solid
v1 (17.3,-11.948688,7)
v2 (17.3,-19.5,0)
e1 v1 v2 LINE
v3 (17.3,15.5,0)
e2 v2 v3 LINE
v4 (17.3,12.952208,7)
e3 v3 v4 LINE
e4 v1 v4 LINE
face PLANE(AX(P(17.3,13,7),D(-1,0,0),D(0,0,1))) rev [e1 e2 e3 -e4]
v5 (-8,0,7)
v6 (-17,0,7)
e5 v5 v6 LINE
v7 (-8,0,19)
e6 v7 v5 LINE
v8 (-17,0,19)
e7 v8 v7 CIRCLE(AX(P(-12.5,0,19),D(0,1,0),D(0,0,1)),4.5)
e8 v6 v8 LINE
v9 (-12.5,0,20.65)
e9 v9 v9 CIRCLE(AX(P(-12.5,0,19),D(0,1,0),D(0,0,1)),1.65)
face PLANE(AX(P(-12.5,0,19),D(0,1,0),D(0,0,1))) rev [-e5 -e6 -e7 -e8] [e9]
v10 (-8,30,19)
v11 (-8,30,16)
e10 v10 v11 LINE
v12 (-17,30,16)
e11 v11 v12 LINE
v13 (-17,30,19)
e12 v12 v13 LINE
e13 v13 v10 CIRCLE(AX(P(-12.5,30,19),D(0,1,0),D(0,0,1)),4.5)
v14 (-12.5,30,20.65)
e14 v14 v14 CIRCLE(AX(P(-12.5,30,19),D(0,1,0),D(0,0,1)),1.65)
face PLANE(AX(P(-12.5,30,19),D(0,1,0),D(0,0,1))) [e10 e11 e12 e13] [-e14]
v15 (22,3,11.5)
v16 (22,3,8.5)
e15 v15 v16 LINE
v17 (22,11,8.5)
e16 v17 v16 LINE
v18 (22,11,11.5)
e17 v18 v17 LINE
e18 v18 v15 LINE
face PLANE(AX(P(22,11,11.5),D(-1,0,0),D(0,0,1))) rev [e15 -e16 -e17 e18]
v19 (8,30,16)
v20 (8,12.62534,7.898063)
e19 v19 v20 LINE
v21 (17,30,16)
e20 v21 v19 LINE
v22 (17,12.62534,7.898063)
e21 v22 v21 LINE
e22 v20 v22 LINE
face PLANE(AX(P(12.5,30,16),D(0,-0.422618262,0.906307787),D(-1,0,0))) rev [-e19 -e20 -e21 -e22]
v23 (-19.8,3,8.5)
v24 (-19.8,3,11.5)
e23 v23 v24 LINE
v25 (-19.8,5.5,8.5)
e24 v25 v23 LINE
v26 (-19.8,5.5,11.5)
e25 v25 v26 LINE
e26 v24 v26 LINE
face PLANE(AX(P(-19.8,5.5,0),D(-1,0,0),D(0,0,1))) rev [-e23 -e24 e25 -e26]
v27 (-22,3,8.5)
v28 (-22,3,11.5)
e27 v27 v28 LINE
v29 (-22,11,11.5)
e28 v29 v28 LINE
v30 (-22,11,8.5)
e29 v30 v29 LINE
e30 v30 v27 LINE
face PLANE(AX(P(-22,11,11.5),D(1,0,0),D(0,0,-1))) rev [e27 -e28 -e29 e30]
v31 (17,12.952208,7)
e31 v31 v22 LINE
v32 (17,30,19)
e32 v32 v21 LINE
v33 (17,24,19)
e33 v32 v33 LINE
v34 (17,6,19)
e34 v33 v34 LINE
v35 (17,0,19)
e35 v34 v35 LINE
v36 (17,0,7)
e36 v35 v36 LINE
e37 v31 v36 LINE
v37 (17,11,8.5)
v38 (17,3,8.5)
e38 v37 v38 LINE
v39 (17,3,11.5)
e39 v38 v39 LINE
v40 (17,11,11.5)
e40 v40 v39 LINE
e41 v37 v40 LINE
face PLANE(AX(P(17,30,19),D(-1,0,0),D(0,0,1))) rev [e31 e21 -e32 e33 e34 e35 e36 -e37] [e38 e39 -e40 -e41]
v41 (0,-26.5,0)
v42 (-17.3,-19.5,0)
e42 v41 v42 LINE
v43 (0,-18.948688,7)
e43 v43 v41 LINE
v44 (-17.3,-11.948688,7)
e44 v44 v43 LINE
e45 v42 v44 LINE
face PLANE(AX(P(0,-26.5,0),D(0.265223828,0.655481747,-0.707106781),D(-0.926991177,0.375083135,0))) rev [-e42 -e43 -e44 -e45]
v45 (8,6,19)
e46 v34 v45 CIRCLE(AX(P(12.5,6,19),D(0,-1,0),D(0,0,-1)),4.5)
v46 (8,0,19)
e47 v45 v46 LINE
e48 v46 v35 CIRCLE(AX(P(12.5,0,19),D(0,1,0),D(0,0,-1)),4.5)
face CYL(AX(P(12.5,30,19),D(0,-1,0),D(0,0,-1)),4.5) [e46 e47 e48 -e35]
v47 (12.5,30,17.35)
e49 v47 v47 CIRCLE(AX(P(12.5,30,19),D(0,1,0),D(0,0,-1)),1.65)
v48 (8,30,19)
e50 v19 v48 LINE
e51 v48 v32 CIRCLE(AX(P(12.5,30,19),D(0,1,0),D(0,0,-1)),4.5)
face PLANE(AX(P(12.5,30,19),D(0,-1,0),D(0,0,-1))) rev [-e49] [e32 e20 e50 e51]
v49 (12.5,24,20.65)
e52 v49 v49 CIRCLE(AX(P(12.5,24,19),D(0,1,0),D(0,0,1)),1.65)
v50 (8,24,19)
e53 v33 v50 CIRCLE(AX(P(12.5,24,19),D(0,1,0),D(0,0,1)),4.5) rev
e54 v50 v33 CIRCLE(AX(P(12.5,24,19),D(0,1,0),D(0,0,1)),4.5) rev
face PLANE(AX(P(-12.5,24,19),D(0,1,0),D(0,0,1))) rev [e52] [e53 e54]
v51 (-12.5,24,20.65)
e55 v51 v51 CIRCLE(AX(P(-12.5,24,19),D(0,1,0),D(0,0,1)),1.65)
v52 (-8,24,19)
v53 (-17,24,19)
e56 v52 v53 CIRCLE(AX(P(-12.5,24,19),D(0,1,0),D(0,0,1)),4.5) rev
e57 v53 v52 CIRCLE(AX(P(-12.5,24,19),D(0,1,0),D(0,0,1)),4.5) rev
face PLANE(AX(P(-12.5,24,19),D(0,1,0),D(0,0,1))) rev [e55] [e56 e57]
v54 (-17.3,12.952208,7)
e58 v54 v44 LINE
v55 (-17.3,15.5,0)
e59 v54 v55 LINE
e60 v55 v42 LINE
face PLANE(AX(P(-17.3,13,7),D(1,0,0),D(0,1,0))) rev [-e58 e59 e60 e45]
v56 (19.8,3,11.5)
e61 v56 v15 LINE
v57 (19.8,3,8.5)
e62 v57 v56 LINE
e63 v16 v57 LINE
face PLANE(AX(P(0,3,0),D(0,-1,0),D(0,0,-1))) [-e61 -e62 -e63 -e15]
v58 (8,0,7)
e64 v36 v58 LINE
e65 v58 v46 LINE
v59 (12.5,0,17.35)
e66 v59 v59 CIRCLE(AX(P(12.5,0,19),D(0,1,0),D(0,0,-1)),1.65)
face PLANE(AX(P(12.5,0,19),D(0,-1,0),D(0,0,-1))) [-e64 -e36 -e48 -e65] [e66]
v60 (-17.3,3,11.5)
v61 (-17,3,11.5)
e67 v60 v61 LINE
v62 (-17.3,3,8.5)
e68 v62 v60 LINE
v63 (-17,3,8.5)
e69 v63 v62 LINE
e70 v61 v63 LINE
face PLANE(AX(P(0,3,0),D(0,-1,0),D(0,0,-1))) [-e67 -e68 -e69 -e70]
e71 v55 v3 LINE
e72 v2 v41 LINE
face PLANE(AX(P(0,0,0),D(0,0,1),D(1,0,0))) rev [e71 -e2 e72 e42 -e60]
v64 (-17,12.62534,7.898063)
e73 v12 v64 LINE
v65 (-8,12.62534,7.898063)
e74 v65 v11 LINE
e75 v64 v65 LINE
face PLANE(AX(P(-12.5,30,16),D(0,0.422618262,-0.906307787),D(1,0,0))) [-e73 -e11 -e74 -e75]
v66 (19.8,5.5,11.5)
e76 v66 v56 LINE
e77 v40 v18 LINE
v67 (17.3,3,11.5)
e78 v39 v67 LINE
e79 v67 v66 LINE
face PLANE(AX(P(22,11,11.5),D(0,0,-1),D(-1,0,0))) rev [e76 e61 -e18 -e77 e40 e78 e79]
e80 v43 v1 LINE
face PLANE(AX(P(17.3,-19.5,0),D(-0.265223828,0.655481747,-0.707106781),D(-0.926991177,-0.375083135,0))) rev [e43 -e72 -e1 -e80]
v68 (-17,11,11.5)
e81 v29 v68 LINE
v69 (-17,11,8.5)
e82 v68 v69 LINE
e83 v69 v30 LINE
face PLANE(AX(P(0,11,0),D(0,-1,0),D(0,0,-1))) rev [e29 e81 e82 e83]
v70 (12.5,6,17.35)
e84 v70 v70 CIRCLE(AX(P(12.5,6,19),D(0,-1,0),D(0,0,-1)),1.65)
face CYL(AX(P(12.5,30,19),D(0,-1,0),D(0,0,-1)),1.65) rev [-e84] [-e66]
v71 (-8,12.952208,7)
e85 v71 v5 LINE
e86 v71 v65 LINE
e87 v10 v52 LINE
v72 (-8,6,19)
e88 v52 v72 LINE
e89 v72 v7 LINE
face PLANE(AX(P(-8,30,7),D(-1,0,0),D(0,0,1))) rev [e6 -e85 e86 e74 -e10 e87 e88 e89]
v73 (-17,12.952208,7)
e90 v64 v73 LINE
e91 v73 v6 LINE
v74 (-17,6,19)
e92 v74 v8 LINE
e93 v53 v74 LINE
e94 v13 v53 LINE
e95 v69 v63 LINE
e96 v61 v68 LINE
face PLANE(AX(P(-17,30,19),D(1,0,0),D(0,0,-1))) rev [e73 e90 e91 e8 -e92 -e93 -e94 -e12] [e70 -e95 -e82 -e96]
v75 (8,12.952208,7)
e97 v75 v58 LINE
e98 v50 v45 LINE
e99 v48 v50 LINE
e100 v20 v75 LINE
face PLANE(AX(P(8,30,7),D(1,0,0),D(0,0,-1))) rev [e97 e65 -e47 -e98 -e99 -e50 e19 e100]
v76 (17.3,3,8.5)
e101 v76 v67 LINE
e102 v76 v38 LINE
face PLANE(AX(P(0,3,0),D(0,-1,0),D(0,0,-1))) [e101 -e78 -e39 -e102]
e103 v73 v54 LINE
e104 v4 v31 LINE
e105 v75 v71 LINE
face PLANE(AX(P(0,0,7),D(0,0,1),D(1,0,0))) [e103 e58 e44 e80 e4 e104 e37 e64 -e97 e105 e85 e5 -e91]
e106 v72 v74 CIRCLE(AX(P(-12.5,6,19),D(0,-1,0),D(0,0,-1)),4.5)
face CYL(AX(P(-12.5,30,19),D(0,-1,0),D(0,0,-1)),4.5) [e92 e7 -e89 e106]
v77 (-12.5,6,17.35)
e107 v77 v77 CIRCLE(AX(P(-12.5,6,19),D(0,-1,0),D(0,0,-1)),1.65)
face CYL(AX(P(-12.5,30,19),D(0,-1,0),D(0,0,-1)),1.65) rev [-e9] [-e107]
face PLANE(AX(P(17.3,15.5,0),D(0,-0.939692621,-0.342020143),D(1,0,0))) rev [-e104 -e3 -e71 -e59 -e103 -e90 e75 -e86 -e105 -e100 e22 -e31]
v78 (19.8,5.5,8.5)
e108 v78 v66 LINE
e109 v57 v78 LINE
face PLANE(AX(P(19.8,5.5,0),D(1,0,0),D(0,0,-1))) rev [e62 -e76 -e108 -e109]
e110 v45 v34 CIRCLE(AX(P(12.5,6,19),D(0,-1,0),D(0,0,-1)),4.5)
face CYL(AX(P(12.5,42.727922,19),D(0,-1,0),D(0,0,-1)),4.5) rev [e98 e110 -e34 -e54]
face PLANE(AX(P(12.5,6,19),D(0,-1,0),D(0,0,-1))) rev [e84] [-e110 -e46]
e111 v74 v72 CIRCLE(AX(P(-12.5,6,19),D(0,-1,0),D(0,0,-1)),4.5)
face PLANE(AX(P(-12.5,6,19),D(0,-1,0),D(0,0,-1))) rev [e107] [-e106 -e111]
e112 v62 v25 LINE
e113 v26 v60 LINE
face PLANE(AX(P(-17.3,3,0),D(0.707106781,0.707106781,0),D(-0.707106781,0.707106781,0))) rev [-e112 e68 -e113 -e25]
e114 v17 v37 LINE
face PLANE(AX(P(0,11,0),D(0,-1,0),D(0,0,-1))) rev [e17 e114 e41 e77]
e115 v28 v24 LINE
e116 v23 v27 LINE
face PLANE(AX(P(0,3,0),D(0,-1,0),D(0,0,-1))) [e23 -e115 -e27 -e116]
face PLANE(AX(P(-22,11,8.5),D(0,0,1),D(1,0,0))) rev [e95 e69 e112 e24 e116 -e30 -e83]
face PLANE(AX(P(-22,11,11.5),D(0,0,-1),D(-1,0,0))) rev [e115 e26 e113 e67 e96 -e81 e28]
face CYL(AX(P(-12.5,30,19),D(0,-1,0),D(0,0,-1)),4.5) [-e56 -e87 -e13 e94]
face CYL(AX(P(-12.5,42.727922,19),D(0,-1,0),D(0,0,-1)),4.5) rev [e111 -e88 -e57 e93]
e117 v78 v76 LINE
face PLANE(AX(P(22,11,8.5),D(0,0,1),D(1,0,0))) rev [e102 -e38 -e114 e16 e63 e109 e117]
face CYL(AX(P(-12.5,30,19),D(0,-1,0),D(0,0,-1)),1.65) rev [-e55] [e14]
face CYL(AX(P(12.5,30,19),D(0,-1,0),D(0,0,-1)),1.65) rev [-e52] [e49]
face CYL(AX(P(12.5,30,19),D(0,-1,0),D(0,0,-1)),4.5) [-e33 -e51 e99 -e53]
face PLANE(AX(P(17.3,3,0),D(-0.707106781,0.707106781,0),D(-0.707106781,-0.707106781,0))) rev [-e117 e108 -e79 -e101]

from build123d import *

# Parameters (mm, degrees)
ESBO_O1_W                  = 34.6
ESBO_O1_H                  = 26
RESSALTO_EXTRUS_O1_DEPTH   = 7
ESBO_O10_W                 = 34.6
ESBO_O10_H                 = 2.5
RESSALTO_EXTRUS_O4_DEPTH   = 7
CHANFRO1_SIZE              = 7
CHANFRO2_SIZE2             = 7
CHANFRO2_SIZE              = 2.54779164
ESBO_O12_R                 = 1.65
RESSALTO_EXTRUS_O5_DEPTH   = 30
RESSALTO_EXTRUS_O6_START   = 3
RESSALTO_EXTRUS_O6_DEPTH   = 8
CORTE_EXTRUS_O2_DEPTH      = 40.089640571
CORTE_EXTRUS_O2_DEPTH_BACK = 40.089640571
CHANFRO3_SIZE              = 9
CHANFRO3_SIZE_2            = 19.300562285
CORTE_EXTRUS_O3_START      = -24
ESBO_O17_R                 = 4.5
CORTE_EXTRUS_O3_DEPTH      = 18


# Some blends are built 0.0001 mm under size
with BuildPart() as part:
    # Esboço1 → Ressalto-extrusão1 (new body)
    with BuildSketch(Plane.XY):
        Rectangle(ESBO_O1_W, ESBO_O1_H)
    extrude(amount=RESSALTO_EXTRUS_O1_DEPTH)

    # Esboço10 → Ressalto-extrusão4 (add)
    with BuildSketch(Plane(origin=(0, 0, 0), x_dir=(-1, 0, 0), z_dir=(0, 0, -1))):
        Polygon((-17.3, -19.5), (0, -26.5), (17.3, -19.5), (17.3, -13), (-17.3, -13), align=None)
        with Locations((0, 14.25)):
            Rectangle(ESBO_O10_W, ESBO_O10_H)
    extrude(amount=-RESSALTO_EXTRUS_O4_DEPTH)

    # Chanfro1
    chanfro1_edges = [part.edges().sort_by_distance(p)[0] for p in [
        (8.65, -23, 7),
        (-8.65, -23, 7),
    ]]
    chamfer(chanfro1_edges, length=CHANFRO1_SIZE - 0.0001)  # a hair under: the kernel refuses the full size

    # Chanfro2
    chanfro2_edges = [part.edges().sort_by_distance(p)[0] for p in [
        (0, 15.5, 7),
    ]]
    chanfro2_side = [part.faces().sort_by_distance(p)[0] for p in [
        (0, 15.449044167, 7),
    ]]
    chamfer(chanfro2_edges, length=CHANFRO2_SIZE - 0.0001, length2=CHANFRO2_SIZE2 - 0.0001, reference=chanfro2_side[0])  # a hair under: the kernel refuses the full size

    # Esboço12 → Ressalto-extrusão5 (add)
    # profile 1 of 2: a face of its own
    with BuildSketch(Plane(origin=(0, 0, 0), x_dir=(1, 0, 0), z_dir=(0, 1, 0))):
        with BuildLine():
            Line((-17, -19), (-17, -7))
            Line((-17, -7), (-8, -7))
            Line((-8, -7), (-8, -19))
            ThreePointArc((-8, -19), (-12.5, -23.5), (-17, -19))
        make_face()
        with Locations(Location((-12.5, -19, 0), (0, 0, 270))):
            Circle(ESBO_O12_R, mode=Mode.SUBTRACT)
    # profile 2 of 2: a face of its own
    with BuildSketch(Plane(origin=(0, 0, 0), x_dir=(1, 0, 0), z_dir=(0, 1, 0))):
        with BuildLine():
            Line((8, -7), (8, -19))
            ThreePointArc((8, -19), (12.5, -23.5), (17, -19))
            Line((17, -19), (17, -7))
            Line((17, -7), (8, -7))
        make_face()
        with Locations(Location((12.5, -19, 0), (0, 0, 90))):
            Circle(ESBO_O12_R, mode=Mode.SUBTRACT)
    extrude(amount=RESSALTO_EXTRUS_O5_DEPTH)

    # Esboço15 → Ressalto-extrusão6 (add)
    with BuildSketch(Plane(origin=(0, 0, 0), x_dir=(1, 0, 0), z_dir=(0, 1, 0)).offset(RESSALTO_EXTRUS_O6_START)):
        Polygon((-22, -11.5), (-22, -8.5), (-17, -8.5), (-17, -7), (-8, -7), (-8, -11.5), align=None)
        Polygon((17, -8.5), (17, -7), (8, -7), (8, -11.5), (22, -11.5), (22, -8.5), align=None)
    extrude(amount=RESSALTO_EXTRUS_O6_DEPTH)

    # Esboço16 → Corte-extrusão2 (cut, two sides: drawn at the far end of the back side and taken through both)
    with BuildSketch(Plane.XY.offset(11.5).offset(-CORTE_EXTRUS_O2_DEPTH_BACK)):
        Polygon((-17.3, 3), (-19.8, 5.5), (-19.8, 3), align=None)
        Polygon((19.8, 3), (17.3, 3), (19.8, 5.5), align=None)
    extrude(amount=CORTE_EXTRUS_O2_DEPTH + CORTE_EXTRUS_O2_DEPTH_BACK, mode=Mode.SUBTRACT)

    # Chanfro3
    # the kernel refuses this chamfer: 19.300562285, 9 mm, written as the material it takes off along each edge
    with BuildSketch(Plane(origin=(-67.007283464, 30, 7), x_dir=(0, 0.07481330637060048, 0.9971975577536772), z_dir=(1, 0, 0))) as chanfro3_piece_1_section:
        Polygon((CHANFRO3_SIZE * 0.997197557754, CHANFRO3_SIZE * 0.0748133063706), (-CHANFRO3_SIZE_2 * 0.074813306369, CHANFRO3_SIZE_2 * 0.997197557732), (0, 0), align=None)
    chanfro3_piece_1 = extrude(amount=109.014566928, mode=Mode.PRIVATE)
    chanfro3_piece_1 = split(chanfro3_piece_1, bisect_by=Plane(origin=(-12.5, 13.283132455, 6.091045576), z_dir=(0, 0.9396953649145792, 0.34201260380000037)), keep=Keep.TOP, mode=Mode.PRIVATE)
    add(chanfro3_piece_1, mode=Mode.SUBTRACT)
    with BuildSketch(Plane(origin=(67.007283464, 30, 7), x_dir=(0, -0.9998669641130703, -0.01631116413111024), z_dir=(-1, 0, 0))) as chanfro3_piece_2_section:
        Polygon((CHANFRO3_SIZE_2 * 0.999866964092, CHANFRO3_SIZE_2 * 0.0163111641308), (-CHANFRO3_SIZE * 0.0163111641311, CHANFRO3_SIZE * 0.999866964113), (0, 0), align=None)
    chanfro3_piece_2 = extrude(amount=109.014566928, mode=Mode.PRIVATE)
    chanfro3_piece_2 = split(chanfro3_piece_2, bisect_by=Plane(origin=(12.5, 13.283132455, 6.091045576), z_dir=(0, 0.9396953649145792, 0.34201260380000037)), keep=Keep.TOP, mode=Mode.PRIVATE)
    add(chanfro3_piece_2, mode=Mode.SUBTRACT)

    # Esboço17 → Corte-extrusão3 (cut)
    with BuildSketch(Plane.XZ.offset(CORTE_EXTRUS_O3_START)):
        with Locations((-12.5, 19)):
            Circle(ESBO_O17_R)
        with Locations((12.5, 19)):
            Circle(ESBO_O17_R)
    extrude(amount=CORTE_EXTRUS_O3_DEPTH, mode=Mode.SUBTRACT)


solid = part.part
